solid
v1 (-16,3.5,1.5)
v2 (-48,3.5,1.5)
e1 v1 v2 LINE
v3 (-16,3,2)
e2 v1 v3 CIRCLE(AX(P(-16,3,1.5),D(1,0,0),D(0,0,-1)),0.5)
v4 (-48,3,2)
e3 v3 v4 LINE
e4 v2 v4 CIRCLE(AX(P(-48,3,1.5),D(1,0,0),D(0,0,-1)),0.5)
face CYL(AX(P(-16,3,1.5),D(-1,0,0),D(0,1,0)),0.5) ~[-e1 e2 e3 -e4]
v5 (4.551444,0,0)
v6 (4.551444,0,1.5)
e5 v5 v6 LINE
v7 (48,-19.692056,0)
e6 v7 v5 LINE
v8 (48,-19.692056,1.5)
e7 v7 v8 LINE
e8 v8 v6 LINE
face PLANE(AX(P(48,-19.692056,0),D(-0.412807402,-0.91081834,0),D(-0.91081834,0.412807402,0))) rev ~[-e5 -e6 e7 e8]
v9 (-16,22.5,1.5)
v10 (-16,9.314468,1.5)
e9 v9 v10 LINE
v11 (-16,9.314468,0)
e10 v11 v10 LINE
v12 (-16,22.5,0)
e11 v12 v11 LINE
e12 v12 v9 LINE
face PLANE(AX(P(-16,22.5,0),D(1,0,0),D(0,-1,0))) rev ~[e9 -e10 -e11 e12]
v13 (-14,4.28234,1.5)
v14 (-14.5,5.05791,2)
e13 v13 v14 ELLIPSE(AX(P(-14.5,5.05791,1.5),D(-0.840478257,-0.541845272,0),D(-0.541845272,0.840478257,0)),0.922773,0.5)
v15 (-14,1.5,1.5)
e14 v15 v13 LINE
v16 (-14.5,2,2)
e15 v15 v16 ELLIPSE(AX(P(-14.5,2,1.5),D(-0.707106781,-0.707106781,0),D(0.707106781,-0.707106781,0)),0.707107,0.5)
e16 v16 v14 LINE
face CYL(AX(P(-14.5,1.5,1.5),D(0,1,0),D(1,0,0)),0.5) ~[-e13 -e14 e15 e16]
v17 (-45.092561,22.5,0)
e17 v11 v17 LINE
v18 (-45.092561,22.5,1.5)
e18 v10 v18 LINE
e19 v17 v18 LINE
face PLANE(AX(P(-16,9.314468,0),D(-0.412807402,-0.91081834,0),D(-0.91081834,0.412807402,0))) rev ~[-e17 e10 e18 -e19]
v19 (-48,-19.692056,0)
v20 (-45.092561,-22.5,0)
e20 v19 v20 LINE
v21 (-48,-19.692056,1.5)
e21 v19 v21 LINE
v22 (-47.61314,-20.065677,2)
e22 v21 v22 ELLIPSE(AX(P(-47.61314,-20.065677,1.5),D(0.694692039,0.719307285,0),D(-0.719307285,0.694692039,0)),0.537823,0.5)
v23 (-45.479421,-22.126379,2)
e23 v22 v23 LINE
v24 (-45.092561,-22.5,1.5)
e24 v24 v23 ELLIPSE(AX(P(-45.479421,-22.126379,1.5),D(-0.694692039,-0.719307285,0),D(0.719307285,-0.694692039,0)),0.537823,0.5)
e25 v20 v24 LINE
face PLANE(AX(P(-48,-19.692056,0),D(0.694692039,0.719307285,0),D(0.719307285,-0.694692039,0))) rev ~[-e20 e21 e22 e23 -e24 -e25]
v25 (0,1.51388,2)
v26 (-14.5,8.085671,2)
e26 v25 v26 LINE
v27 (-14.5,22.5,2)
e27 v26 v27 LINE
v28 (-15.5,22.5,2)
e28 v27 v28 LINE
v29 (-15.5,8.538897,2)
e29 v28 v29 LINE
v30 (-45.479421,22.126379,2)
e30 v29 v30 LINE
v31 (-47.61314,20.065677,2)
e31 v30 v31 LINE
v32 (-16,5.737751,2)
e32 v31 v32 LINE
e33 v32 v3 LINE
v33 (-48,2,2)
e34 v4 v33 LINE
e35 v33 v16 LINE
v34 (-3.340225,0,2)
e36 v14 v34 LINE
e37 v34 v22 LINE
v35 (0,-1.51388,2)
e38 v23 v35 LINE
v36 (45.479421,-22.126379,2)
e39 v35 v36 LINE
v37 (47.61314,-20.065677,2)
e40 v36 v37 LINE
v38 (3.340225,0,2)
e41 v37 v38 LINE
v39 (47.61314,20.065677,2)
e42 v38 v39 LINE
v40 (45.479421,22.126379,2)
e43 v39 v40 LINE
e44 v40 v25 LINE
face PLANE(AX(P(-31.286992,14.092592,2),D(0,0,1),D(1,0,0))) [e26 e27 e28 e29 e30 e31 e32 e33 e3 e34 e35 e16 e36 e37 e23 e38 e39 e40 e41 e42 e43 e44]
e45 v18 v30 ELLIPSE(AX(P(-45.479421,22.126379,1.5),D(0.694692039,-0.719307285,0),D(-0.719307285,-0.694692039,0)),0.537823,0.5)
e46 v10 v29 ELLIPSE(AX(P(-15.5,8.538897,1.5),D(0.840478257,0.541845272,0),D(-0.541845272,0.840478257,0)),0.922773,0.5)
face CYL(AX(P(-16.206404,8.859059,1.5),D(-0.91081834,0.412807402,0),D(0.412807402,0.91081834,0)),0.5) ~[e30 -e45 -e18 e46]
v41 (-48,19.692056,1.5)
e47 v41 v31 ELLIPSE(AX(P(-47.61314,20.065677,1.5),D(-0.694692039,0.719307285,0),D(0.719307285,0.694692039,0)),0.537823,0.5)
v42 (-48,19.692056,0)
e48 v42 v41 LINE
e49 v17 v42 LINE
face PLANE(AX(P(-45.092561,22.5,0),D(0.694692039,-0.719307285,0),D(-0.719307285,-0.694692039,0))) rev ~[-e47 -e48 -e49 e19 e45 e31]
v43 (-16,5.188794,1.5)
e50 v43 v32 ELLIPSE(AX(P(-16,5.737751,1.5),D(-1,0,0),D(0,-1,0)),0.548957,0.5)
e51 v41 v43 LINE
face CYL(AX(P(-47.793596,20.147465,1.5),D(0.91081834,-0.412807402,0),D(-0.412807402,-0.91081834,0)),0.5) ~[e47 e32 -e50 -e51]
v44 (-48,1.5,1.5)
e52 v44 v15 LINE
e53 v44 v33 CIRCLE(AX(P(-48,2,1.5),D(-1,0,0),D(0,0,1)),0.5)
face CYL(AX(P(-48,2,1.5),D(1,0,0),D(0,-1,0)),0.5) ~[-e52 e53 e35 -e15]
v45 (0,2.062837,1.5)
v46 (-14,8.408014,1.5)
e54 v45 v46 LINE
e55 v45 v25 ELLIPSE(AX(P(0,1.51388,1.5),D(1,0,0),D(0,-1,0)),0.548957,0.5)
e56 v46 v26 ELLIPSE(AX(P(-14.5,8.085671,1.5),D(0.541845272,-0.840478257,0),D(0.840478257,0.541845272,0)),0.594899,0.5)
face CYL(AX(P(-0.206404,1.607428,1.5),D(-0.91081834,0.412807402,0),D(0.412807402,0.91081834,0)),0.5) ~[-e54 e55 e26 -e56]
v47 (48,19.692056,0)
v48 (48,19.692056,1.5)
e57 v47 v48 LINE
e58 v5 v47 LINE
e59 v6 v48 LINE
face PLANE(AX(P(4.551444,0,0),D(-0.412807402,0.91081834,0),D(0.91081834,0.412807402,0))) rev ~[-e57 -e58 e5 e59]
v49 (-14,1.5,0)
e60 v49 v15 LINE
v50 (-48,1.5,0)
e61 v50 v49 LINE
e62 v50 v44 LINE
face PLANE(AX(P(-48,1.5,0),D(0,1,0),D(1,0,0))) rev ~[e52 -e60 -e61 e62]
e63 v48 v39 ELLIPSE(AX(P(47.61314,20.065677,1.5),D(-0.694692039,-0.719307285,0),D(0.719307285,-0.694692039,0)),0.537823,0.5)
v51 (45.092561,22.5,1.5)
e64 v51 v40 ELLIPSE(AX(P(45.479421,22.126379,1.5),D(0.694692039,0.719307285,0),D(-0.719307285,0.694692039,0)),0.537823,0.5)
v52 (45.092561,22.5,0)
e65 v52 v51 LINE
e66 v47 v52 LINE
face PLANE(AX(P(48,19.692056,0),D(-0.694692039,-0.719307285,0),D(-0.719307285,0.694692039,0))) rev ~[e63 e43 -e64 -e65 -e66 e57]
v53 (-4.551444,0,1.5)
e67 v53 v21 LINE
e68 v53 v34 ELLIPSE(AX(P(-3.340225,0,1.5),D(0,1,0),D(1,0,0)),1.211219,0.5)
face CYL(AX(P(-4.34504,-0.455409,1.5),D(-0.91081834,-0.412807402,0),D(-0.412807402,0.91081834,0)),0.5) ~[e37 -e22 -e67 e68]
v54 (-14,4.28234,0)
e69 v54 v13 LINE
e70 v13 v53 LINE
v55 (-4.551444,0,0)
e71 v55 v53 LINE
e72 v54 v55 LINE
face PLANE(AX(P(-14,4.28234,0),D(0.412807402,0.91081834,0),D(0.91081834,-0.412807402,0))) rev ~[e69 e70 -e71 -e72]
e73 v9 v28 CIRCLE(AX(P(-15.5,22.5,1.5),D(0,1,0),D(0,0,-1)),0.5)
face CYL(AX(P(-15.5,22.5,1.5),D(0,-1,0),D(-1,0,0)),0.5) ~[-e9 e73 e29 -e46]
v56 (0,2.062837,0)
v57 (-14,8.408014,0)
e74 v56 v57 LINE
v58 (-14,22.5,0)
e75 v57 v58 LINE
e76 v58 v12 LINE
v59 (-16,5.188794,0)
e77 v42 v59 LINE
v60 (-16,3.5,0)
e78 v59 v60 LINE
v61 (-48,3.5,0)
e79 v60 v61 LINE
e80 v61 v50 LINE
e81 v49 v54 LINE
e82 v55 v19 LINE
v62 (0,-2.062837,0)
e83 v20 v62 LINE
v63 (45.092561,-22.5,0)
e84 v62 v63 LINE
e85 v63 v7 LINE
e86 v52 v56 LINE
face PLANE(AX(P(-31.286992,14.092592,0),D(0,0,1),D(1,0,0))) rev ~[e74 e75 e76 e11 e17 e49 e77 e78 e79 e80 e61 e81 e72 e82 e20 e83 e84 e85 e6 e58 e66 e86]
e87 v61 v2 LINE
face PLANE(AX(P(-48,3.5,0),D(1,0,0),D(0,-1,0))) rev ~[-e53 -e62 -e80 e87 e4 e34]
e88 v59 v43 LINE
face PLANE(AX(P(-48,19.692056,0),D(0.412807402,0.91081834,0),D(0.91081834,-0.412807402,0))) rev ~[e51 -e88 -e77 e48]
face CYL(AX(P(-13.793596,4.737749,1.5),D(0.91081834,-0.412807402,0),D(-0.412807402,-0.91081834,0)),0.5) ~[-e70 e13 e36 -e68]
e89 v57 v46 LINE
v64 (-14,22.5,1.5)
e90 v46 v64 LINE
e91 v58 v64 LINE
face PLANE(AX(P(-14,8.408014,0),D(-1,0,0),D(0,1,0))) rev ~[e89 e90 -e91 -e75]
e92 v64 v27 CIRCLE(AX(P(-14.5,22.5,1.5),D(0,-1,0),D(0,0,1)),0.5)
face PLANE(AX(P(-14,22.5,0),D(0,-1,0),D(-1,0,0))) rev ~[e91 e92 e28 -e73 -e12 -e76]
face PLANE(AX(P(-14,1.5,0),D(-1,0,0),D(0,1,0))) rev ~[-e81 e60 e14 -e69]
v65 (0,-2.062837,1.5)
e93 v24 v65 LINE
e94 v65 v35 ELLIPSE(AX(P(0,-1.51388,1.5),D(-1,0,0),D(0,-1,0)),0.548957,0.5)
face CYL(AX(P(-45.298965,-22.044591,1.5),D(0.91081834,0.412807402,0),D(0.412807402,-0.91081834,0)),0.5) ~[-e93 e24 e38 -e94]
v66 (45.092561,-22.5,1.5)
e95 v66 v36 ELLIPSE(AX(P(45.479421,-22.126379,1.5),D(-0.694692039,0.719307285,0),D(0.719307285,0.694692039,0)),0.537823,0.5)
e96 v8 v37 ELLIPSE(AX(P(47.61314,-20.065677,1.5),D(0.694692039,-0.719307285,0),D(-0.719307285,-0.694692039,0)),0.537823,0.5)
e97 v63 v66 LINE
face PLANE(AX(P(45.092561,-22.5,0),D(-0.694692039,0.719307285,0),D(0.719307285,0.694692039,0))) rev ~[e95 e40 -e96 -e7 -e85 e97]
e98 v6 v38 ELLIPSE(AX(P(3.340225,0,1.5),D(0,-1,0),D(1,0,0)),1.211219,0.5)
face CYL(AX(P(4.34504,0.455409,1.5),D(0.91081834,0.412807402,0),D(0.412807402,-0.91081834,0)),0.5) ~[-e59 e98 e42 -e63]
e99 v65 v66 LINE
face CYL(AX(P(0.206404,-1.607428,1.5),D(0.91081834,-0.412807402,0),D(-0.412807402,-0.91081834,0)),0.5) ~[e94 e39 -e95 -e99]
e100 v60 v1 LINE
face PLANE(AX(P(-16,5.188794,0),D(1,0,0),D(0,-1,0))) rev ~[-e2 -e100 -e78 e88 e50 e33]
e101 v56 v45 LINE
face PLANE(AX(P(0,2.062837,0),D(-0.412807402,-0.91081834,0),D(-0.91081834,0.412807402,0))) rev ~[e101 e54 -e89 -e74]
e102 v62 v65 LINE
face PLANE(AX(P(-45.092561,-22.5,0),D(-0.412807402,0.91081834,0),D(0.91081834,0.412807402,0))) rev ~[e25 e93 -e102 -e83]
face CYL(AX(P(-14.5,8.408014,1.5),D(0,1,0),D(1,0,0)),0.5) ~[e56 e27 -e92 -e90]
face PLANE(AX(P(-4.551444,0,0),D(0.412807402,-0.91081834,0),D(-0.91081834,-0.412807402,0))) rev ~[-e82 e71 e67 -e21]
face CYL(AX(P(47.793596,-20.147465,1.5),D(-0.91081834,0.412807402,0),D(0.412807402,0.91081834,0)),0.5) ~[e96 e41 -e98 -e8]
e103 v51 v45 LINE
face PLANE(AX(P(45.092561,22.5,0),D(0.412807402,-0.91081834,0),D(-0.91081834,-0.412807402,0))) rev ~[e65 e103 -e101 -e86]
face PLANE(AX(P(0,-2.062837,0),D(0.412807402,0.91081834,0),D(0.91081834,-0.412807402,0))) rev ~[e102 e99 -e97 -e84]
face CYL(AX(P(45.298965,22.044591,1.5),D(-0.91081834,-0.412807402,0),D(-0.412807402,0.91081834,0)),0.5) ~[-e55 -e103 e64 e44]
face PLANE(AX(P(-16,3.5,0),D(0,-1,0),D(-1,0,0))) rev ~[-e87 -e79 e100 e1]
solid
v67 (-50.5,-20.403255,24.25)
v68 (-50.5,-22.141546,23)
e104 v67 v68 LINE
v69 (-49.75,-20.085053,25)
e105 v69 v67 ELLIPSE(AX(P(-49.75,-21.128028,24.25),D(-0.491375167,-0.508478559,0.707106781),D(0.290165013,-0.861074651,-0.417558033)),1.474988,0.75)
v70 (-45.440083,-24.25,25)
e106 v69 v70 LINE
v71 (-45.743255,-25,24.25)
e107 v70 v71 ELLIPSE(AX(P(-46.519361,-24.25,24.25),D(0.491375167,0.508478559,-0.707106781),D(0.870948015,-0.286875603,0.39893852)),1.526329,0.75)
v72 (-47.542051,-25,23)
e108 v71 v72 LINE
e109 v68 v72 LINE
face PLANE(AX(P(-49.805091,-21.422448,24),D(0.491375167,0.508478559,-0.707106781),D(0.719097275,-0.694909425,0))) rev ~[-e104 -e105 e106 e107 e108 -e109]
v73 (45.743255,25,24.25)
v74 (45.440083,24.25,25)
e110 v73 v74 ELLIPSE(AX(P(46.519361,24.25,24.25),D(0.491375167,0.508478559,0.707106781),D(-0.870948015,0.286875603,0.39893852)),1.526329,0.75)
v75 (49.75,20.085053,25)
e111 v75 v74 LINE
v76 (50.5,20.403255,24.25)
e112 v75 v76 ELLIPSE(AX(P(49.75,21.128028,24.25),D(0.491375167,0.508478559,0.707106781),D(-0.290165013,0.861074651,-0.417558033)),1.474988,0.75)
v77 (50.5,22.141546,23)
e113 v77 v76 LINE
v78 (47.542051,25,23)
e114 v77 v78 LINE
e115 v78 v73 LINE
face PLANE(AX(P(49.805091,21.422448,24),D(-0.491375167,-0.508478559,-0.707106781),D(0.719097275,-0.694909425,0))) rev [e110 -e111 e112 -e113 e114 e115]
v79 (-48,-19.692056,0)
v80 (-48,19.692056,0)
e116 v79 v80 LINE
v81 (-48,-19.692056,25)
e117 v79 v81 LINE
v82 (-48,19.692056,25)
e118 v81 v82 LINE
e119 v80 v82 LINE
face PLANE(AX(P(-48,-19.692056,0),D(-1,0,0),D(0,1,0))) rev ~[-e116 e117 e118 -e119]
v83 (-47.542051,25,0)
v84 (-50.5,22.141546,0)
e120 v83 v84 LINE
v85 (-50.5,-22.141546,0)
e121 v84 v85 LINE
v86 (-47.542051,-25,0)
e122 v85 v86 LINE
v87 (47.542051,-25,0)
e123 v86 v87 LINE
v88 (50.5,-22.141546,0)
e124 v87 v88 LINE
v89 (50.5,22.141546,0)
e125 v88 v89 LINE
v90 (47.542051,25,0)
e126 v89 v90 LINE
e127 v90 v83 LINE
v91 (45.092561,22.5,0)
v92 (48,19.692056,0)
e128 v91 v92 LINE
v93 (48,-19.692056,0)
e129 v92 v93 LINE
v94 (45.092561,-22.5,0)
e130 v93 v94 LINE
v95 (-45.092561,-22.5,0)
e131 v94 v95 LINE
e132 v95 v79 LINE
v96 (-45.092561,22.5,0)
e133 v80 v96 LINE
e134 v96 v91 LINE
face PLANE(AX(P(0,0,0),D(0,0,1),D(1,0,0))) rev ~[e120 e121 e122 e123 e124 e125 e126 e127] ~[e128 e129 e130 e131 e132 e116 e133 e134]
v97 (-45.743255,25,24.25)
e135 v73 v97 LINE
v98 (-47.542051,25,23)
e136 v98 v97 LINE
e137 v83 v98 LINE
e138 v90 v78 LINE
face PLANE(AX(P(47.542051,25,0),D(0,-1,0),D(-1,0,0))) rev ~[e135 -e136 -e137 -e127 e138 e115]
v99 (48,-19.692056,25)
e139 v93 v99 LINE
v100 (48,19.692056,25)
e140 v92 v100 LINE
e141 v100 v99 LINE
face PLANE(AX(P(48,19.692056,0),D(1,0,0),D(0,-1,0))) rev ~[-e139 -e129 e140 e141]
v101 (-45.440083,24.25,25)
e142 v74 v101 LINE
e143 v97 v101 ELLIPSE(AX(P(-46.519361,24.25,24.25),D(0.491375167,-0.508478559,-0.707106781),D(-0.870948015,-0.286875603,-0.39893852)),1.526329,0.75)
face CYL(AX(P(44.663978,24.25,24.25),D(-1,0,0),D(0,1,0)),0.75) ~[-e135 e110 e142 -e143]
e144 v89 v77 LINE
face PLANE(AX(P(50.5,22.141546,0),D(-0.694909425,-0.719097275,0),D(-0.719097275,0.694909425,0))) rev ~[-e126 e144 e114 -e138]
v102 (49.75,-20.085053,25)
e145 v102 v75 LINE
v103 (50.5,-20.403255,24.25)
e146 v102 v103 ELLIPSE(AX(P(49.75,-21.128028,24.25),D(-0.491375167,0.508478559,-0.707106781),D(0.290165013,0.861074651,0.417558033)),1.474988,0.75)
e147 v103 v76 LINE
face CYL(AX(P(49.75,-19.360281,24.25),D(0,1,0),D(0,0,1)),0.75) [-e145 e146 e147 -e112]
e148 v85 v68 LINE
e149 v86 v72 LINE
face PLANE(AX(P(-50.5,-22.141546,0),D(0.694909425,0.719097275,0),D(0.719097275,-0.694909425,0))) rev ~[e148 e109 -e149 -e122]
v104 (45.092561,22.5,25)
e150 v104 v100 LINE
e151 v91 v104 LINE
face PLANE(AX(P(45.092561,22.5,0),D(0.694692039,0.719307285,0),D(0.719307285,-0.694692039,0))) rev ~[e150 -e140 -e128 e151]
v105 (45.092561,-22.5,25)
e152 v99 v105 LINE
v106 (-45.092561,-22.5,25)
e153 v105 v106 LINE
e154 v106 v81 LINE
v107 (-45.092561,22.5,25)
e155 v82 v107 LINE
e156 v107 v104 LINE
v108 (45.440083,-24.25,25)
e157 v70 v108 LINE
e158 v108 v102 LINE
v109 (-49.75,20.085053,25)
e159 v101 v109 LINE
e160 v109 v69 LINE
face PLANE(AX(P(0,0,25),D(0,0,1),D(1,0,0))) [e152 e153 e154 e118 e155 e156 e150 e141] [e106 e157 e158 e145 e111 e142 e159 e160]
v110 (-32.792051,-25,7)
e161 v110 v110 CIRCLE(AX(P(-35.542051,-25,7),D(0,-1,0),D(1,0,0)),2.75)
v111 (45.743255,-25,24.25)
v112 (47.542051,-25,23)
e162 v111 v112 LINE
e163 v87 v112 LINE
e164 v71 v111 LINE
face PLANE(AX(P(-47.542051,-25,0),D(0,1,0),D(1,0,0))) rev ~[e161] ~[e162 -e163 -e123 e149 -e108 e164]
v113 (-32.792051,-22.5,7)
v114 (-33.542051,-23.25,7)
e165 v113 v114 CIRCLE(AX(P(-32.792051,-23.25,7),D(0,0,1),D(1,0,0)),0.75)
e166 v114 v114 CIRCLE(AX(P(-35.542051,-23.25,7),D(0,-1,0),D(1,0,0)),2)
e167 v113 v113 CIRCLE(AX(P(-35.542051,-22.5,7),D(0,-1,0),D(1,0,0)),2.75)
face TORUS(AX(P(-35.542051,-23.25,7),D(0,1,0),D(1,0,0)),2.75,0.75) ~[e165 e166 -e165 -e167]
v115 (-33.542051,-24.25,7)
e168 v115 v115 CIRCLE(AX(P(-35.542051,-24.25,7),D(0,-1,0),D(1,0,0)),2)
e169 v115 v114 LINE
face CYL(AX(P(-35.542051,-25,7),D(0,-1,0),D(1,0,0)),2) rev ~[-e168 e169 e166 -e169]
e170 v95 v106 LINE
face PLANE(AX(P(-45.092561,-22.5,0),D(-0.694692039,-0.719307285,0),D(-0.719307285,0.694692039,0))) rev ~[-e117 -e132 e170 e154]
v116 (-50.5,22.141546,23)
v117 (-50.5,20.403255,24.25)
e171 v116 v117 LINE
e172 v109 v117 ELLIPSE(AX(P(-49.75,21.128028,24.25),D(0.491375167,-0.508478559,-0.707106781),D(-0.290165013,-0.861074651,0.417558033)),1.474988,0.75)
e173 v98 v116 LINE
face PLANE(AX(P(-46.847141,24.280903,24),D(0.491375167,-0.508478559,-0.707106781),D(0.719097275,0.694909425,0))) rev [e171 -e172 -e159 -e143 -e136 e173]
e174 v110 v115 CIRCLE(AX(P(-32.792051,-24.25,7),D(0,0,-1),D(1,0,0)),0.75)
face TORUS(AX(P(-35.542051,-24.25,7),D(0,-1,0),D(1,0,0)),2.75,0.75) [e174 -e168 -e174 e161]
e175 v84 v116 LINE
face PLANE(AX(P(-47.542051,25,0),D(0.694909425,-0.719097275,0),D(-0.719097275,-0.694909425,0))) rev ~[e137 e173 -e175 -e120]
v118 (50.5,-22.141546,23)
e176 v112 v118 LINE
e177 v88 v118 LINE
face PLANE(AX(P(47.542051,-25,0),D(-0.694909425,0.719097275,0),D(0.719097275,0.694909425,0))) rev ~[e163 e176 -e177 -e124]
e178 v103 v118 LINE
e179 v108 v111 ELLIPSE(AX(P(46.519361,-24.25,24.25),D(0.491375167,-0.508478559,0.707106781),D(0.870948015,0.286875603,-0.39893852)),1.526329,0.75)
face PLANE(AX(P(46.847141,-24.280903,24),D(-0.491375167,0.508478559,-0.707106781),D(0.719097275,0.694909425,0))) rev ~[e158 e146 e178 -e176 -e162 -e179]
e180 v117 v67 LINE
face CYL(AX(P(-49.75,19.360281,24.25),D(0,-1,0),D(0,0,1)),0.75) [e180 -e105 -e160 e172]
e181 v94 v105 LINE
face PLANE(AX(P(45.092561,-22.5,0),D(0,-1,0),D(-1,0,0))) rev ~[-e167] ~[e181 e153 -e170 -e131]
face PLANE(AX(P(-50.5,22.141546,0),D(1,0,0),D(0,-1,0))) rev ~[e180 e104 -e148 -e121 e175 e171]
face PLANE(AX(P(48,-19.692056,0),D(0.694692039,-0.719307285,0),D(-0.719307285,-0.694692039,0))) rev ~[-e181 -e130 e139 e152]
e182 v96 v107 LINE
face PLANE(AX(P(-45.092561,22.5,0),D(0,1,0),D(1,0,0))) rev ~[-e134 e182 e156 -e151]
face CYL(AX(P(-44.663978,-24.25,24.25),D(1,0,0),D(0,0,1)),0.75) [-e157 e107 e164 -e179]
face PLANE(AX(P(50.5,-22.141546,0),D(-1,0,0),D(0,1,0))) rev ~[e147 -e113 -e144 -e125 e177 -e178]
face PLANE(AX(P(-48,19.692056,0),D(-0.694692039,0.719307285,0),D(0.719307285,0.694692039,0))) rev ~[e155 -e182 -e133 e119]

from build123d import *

# Parameters (mm, degrees)
F1_DEPTH = 25
F2_R     = 2
F3_DEPTH = 25
F4_SIZE  = 2
F5_DEPTH = 2
F6_R     = 0.5
F7_R     = 0.75


with BuildPart() as f1:
    # F0 (on Top) → F1 (new body)
    with BuildSketch(Plane.XY):
        Polygon((47.5420507878, 25), (-47.5420507878, 25), (-50.5, 22.1415455767), (-50.5, -22.1415455767), (-47.5420507878, -25), (47.5420507878, -25), (50.5, -22.1415455767), (50.5, 22.1415455767), align=None)
        Polygon((-48, 19.6920558339), (-45.092561045, 22.5), (-16, 22.5), (-14, 22.5), (45.092561045, 22.5), (48, 19.6920558339), (48, -19.6920558339), (45.092561045, -22.5), (-45.092561045, -22.5), (-48, -19.6920558339), (-48, 1.5), (-48, 3.5), align=None, mode=Mode.SUBTRACT)
    extrude(amount=F1_DEPTH)

    # F2 (on face) → F3 (cut)
    with BuildSketch(Plane.XZ.offset(25)):
        with Locations((-35.5420507878, 7)):
            Circle(F2_R)
    extrude(amount=-F3_DEPTH, mode=Mode.SUBTRACT)

    # F4
    f4_edges = [f1.edges().sort_by_distance(p)[0] for p in [
        (-49.021025, -23.570773, 25),
        (49.021025, -23.570773, 25),
        (49.021025, 23.570773, 25),
        (-49.021025, 23.570773, 25),
    ]]
    chamfer(f4_edges, length=F4_SIZE)

    # F7
    f7_edges = [f1.edges().sort_by_distance(p)[0] for p in [
        (0, -25, 25),
        (-50.5, 0, 25),
        (0, 25, 25),
        (50.5, 0, 25),
        (-37.542051, -25, 7),
        (-33.542051, -23.75, 7),
        (-37.542051, -22.5, 7),
    ]]
    fillet(f7_edges, radius=F7_R)


with BuildPart() as f5:
    # F0 (on Top) → F5 (new body)
    with BuildSketch(Plane.XY):
        Polygon((-16, 9.3144678137), (-45.092561045, 22.5), (-48, 19.6920558339), (-16, 5.1887940101), align=None)
        Polygon((-14, 22.5), (-16, 22.5), (-16, 9.3144678137), (-16, 5.1887940101), (-16, 3.5), (-48, 3.5), (-48, 1.5), (-14, 1.5), (-14, 4.2823401461), (-14, 8.4080139497), align=None)
        Polygon((48, 19.6920558339), (45.092561045, 22.5), (0, 2.0628369018), (-14, 8.4080139497), (-14, 4.2823401461), (-4.5514437827, 0), (-48, -19.6920558339), (-45.092561045, -22.5), (0, -2.0628369018), (45.092561045, -22.5), (48, -19.6920558339), (4.5514437827, 0), align=None)
    extrude(amount=F5_DEPTH)

    # F6
    f6_edges = [f5.edges().sort_by_distance(p)[0] for p in [
        (-30.546281, 15.907234, 2),
        (-32, 12.440425, 2),
        (-32, 3.5, 2),
        (-31, 1.5, 2),
        (-14, 2.89117, 2),
        (-9.275722, 2.14117, 2),
        (22.546281, 12.281418, 2),
        (26.275722, 9.846028, 2),
        (22.546281, -12.281418, 2),
        (26.275722, -9.846028, 2),
        (-22.546281, -12.281418, 2),
        (-26.275722, -9.846028, 2),
        (-14, 15.454007, 2),
        (-16, 15.907234, 2),
        (-7, 5.235425, 2),
    ]]
    fillet(f6_edges, radius=F6_R)


solid = Compound([f1.part, f5.part])
